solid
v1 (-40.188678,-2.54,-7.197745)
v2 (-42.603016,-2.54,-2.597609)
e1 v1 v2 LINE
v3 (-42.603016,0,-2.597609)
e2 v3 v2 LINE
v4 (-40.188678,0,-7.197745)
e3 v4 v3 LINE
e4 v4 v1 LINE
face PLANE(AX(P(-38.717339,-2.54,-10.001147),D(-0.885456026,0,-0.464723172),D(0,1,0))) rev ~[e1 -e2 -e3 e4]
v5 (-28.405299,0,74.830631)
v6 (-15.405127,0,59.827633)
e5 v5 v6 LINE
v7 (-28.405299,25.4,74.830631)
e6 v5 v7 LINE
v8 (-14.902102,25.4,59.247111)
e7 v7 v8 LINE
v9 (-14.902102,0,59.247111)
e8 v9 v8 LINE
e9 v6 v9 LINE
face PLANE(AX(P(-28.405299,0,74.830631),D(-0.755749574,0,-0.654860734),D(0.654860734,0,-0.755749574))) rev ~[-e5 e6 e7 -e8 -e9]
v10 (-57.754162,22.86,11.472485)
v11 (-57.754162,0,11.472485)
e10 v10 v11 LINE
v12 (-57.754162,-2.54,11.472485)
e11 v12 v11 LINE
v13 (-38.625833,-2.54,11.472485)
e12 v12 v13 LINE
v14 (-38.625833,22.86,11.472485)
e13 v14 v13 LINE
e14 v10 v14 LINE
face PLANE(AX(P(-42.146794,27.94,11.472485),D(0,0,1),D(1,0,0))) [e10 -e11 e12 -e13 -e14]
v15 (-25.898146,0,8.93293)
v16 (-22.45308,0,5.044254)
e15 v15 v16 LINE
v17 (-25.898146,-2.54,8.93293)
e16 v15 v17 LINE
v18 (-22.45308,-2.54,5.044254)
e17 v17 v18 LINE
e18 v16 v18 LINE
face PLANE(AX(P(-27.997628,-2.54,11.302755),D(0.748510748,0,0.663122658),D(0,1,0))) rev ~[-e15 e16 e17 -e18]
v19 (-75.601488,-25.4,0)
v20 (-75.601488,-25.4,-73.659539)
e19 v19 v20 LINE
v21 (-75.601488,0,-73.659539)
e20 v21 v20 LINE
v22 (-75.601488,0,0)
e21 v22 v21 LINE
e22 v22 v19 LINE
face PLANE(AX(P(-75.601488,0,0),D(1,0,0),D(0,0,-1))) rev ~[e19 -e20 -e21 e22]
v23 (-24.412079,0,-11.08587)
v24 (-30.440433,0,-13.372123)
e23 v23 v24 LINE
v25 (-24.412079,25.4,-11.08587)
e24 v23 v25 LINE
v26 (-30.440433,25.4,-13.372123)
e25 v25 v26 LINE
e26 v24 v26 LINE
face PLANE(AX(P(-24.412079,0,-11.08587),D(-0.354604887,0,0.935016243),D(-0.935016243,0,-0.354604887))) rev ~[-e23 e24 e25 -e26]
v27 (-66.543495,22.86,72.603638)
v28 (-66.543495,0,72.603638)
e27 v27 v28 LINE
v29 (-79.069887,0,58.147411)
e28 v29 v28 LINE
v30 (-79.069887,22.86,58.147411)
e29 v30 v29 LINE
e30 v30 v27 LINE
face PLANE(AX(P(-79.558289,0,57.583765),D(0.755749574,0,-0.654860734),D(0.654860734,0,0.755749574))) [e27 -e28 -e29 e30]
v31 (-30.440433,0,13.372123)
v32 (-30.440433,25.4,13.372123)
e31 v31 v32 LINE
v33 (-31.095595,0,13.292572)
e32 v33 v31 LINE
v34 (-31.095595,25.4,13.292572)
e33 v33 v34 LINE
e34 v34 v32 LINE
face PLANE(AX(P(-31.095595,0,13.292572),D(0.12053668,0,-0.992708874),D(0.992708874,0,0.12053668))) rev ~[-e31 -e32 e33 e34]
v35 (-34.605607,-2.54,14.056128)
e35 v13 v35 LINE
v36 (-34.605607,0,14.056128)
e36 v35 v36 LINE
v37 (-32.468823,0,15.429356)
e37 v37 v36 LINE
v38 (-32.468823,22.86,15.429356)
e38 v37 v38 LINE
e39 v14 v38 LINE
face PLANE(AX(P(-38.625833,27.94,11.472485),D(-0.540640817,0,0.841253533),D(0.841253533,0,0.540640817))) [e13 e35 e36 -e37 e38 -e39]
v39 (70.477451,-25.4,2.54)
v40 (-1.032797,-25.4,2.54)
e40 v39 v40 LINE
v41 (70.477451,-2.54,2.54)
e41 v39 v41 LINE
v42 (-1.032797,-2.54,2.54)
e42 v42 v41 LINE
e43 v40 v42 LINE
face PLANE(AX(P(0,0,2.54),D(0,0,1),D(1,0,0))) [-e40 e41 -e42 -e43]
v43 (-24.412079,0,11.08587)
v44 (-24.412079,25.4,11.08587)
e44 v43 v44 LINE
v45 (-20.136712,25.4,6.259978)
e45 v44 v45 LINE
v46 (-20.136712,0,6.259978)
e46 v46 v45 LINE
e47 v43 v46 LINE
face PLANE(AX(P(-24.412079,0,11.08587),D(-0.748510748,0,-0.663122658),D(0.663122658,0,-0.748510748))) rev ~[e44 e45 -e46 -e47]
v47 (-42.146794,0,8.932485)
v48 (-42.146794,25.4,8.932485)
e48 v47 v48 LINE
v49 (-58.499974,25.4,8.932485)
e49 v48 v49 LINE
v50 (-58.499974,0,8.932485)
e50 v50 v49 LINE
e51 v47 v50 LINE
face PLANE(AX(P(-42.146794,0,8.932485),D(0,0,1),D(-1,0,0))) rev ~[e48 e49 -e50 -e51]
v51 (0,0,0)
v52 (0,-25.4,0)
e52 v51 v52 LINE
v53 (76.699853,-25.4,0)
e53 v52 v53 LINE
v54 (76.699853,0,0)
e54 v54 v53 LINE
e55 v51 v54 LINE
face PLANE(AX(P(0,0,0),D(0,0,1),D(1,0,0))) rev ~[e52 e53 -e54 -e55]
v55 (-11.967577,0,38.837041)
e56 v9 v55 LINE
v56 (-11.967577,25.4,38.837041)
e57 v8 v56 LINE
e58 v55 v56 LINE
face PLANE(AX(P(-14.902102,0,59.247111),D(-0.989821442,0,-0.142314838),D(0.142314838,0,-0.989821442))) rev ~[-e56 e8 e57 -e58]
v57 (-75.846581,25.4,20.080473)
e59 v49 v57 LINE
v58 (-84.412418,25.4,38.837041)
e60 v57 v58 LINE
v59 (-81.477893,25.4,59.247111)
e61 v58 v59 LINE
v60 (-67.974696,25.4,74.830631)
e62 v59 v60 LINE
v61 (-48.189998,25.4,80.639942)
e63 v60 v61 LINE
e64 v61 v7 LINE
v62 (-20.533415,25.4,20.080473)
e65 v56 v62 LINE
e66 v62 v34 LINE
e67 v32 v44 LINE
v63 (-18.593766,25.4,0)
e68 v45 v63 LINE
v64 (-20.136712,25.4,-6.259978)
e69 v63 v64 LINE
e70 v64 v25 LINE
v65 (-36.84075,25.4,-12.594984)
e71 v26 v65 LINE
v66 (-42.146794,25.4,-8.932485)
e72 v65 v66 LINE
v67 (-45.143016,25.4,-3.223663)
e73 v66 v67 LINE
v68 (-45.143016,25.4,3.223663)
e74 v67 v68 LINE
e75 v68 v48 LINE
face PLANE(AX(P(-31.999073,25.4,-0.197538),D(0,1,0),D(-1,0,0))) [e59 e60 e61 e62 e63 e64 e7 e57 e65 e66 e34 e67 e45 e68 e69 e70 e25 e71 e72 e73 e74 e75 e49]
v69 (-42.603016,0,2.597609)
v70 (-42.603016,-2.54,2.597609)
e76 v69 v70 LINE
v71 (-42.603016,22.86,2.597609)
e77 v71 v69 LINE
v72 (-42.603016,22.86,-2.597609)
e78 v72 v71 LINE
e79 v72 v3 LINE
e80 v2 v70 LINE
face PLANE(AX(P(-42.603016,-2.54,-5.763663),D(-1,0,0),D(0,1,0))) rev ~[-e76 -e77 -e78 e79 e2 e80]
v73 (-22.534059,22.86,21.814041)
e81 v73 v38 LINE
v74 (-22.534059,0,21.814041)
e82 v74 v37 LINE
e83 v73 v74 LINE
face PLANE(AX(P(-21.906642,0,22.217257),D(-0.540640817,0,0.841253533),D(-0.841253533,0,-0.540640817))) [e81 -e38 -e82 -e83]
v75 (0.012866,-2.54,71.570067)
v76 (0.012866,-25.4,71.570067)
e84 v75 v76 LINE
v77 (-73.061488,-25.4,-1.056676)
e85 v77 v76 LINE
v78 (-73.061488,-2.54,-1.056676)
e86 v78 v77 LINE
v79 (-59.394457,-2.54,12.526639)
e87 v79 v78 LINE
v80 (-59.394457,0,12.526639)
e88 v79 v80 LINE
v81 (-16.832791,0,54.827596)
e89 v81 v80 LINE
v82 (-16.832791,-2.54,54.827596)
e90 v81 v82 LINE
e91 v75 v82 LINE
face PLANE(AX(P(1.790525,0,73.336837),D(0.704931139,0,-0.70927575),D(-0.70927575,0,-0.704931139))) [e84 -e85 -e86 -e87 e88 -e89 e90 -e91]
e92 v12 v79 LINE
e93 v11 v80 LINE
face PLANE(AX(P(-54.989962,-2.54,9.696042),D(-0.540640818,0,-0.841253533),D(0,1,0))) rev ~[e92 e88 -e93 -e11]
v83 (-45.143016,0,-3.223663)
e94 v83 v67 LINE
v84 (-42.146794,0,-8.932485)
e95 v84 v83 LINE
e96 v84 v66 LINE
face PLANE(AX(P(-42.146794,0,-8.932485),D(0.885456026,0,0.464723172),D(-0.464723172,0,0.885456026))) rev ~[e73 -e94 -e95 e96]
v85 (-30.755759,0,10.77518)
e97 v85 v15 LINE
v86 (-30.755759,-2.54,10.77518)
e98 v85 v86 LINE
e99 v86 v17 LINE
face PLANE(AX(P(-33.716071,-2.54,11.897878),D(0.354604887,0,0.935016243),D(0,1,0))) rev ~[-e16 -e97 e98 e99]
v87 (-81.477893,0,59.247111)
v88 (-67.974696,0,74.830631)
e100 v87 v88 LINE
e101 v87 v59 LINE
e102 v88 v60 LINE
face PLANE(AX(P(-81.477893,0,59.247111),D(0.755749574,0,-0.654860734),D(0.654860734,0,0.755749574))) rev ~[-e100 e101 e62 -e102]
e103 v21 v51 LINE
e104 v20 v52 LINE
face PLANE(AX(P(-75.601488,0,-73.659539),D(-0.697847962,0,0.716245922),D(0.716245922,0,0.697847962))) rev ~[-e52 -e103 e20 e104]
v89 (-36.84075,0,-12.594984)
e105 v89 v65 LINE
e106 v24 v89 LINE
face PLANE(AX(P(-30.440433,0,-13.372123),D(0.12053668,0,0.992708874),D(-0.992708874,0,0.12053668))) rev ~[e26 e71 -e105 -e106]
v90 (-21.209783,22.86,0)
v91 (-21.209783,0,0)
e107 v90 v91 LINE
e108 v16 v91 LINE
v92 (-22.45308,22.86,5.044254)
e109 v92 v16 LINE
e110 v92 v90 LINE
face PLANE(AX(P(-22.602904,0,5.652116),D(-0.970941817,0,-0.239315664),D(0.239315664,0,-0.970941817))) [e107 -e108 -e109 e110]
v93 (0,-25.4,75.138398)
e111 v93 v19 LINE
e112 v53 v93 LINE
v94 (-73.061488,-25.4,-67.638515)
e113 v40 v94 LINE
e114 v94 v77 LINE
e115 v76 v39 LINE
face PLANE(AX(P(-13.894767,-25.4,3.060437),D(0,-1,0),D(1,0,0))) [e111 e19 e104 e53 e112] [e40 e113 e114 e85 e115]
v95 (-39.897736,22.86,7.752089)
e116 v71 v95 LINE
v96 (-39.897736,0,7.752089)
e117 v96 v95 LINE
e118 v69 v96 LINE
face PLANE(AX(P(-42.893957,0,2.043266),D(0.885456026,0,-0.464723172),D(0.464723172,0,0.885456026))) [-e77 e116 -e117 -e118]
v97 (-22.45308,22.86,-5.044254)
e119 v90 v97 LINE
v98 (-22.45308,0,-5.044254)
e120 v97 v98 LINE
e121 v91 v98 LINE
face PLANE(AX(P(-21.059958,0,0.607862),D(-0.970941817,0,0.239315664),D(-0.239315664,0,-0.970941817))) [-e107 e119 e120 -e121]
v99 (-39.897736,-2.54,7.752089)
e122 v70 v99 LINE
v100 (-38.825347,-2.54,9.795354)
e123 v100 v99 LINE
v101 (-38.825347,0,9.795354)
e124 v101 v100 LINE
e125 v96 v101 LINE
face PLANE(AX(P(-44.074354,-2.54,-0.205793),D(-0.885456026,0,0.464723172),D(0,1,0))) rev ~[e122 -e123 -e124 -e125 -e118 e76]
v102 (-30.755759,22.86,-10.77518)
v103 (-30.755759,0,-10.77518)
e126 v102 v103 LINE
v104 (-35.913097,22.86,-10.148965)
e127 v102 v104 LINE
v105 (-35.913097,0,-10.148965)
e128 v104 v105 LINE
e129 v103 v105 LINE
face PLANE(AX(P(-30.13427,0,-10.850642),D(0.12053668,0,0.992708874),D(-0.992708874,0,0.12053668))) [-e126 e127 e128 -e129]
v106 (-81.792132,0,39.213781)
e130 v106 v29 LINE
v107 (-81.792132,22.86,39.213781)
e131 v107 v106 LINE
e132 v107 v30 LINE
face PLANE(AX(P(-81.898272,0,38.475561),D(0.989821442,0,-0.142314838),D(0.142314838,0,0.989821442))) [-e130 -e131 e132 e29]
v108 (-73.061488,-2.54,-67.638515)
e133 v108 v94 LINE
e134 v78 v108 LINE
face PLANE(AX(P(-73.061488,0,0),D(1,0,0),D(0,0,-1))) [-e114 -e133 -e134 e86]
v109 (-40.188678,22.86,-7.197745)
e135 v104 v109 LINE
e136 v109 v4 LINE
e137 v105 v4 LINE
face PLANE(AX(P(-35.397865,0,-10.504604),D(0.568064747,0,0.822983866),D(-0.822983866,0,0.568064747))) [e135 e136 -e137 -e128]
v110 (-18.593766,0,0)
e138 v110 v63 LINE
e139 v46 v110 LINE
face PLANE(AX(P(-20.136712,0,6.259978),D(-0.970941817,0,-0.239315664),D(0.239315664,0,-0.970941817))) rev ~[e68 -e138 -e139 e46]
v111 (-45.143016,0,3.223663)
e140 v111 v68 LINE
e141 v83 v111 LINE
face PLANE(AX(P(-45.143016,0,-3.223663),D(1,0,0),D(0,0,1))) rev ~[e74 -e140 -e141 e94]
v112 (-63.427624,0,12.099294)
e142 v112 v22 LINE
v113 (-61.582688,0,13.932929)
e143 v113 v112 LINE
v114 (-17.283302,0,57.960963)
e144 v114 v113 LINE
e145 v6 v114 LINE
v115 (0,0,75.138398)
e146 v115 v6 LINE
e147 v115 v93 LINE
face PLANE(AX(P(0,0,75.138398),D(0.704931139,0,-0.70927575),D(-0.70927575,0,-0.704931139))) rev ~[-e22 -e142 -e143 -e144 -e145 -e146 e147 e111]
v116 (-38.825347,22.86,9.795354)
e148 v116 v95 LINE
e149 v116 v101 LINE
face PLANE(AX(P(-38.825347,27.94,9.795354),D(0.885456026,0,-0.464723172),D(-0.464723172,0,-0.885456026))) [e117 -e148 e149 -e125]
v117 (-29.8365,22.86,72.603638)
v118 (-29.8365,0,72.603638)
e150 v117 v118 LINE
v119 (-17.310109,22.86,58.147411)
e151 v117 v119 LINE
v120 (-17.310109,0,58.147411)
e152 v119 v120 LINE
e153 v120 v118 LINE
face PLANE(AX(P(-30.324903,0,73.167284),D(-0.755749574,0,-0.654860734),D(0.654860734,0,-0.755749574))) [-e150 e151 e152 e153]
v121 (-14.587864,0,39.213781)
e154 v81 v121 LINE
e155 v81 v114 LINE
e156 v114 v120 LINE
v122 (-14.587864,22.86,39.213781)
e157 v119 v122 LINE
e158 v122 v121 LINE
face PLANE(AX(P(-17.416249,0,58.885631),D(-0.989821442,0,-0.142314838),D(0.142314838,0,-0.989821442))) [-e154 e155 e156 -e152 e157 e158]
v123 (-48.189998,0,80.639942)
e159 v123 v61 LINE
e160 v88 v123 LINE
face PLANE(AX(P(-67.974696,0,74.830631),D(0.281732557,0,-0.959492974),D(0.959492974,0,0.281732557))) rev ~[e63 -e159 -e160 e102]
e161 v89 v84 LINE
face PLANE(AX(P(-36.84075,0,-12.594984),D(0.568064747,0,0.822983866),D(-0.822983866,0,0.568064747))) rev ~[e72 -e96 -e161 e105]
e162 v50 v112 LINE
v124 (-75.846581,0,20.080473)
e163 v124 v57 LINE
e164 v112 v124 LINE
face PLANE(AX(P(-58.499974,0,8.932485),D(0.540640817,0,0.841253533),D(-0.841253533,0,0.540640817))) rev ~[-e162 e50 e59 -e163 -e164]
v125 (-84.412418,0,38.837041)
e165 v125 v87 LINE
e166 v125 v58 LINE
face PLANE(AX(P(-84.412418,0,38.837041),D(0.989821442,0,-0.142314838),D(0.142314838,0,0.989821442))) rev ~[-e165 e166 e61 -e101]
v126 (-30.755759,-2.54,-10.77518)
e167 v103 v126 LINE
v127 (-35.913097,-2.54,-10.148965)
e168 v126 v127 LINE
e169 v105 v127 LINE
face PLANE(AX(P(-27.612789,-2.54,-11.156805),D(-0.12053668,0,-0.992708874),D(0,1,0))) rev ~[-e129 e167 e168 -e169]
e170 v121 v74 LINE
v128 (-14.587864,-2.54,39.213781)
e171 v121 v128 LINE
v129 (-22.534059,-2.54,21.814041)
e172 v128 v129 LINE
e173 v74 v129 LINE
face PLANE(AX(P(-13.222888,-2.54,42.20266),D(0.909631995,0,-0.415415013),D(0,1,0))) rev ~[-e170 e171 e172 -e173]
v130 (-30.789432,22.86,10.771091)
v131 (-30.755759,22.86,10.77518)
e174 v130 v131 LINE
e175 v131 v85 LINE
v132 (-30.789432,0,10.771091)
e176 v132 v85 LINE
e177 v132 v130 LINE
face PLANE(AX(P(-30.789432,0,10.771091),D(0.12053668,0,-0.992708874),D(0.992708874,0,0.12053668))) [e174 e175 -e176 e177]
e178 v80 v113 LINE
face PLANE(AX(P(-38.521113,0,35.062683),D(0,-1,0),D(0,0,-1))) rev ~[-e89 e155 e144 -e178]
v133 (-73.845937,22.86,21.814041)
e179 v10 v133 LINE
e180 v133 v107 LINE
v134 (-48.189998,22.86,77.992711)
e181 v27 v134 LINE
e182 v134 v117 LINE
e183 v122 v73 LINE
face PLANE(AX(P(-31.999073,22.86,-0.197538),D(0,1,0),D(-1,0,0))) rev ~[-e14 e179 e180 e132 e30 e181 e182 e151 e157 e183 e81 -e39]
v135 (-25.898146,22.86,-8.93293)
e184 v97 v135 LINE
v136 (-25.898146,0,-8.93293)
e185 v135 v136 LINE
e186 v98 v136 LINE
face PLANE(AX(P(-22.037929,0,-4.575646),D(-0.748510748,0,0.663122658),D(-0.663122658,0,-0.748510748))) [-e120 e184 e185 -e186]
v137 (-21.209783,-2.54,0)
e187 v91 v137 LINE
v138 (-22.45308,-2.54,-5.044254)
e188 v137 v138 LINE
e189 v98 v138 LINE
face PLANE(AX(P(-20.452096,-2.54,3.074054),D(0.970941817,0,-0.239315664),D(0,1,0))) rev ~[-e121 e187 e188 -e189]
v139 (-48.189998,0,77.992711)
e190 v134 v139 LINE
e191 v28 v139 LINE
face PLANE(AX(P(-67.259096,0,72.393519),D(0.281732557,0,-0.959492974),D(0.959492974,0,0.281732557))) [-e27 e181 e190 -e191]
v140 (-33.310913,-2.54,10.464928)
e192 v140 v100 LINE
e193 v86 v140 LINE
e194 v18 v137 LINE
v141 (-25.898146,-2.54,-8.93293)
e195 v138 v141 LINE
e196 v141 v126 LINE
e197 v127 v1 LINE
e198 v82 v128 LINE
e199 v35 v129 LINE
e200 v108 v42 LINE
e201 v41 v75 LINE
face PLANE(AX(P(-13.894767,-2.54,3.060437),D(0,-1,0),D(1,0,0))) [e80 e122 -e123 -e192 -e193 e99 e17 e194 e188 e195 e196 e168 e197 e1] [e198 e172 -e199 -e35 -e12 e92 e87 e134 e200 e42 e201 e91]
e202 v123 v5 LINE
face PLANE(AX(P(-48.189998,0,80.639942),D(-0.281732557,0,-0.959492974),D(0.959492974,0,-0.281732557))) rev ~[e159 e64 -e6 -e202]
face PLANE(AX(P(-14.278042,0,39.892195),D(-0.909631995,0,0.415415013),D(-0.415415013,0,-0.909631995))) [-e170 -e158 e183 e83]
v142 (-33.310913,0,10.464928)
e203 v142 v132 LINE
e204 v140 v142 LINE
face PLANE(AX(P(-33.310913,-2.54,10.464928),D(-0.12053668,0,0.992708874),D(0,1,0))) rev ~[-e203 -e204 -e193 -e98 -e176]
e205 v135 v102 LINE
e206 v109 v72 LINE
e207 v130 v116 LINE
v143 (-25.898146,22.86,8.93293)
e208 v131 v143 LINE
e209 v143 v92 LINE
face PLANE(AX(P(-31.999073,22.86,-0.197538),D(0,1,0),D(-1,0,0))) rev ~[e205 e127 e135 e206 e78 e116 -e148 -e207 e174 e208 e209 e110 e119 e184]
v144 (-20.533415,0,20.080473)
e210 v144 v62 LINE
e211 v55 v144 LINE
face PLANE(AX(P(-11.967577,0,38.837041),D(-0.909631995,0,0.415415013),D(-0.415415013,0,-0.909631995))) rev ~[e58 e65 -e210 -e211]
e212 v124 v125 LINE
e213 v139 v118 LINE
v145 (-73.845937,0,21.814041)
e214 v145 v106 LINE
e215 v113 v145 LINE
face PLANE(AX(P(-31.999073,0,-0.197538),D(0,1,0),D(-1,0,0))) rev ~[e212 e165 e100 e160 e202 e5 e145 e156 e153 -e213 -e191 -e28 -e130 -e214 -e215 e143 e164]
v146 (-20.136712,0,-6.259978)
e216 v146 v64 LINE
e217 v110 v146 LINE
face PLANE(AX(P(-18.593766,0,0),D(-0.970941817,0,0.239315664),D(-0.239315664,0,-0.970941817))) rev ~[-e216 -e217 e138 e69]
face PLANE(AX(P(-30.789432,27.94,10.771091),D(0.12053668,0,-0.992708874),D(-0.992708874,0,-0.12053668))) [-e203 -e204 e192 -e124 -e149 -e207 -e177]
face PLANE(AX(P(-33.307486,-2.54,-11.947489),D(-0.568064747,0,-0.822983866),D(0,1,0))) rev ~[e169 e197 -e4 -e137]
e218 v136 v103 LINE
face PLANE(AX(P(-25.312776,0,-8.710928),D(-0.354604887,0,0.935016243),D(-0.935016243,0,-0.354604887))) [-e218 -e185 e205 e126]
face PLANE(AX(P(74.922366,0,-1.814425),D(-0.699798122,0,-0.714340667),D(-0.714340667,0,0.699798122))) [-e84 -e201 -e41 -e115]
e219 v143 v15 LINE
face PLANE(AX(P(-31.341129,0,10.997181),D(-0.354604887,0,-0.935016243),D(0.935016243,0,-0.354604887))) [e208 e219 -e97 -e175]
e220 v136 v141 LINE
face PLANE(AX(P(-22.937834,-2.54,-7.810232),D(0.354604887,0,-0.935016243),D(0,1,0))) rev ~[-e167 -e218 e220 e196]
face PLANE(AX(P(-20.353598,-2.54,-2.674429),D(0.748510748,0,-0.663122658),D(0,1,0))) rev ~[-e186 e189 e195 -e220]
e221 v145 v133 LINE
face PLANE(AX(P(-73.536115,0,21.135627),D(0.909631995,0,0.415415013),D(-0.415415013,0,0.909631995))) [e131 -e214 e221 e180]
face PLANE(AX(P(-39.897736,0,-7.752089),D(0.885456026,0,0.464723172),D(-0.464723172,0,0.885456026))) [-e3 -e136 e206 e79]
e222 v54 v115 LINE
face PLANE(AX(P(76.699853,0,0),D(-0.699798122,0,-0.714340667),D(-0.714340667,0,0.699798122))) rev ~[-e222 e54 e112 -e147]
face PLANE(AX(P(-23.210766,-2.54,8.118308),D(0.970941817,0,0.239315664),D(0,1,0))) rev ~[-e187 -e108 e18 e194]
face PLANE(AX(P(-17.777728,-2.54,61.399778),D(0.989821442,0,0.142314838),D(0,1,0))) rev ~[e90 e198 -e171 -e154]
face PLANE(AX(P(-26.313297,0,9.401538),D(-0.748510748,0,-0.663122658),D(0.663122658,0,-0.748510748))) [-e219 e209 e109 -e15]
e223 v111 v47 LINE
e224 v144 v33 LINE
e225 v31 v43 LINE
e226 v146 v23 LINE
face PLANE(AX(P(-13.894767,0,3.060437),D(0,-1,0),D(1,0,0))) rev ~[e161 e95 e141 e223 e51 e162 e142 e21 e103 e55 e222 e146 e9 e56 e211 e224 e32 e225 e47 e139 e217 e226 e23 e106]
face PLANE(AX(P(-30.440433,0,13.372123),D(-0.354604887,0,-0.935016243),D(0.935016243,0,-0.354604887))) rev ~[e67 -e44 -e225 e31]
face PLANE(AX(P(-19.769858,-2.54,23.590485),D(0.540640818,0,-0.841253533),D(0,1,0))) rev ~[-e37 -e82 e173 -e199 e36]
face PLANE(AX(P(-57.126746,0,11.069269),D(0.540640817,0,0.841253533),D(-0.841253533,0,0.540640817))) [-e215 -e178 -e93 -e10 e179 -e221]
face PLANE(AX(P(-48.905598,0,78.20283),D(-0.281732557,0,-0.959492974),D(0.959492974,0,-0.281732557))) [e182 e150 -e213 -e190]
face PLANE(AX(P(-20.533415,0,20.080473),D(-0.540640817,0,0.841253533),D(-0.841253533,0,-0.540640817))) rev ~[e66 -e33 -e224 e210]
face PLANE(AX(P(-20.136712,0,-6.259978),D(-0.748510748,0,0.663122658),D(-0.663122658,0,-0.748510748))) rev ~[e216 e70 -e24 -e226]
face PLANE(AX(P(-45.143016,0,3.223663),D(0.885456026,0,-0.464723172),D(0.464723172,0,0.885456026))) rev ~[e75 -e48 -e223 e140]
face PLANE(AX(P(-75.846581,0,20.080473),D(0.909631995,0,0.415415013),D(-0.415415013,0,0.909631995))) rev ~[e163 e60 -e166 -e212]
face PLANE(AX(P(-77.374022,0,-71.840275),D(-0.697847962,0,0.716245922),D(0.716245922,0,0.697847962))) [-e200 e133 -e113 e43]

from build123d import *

# Parameters (mm, degrees)
F1_DEPTH     = 25.4
F2_T         = -2.54
F4_DEPTH     = 25.4
F5_T         = 2.54
F5_T3_DEPTH  = 30.48
F5_T5_DEPTH  = 10.9375095944
F5_T7_DEPTH  = 21.4331791904
F5_T9_DEPTH  = 11.5273250997
F5_T11_DEPTH = 11.5273250997
F5_T13_DEPTH = 11.5273250997
F5_T15_DEPTH = 11.5273250997
F5_T17_DEPTH = 11.5273250997
F5_T19_DEPTH = 11.5273250997
F5_T21_DEPTH = 11.5273250997
F5_T23_DEPTH = 11.5273250997
F5_T25_DEPTH = 11.5273250997
F5_T27_DEPTH = 11.5273250997
F5_T29_DEPTH = 11.5273250997
F5_T31_DEPTH = 5.7399744024
F5_T33_DEPTH = 17.6352883916
F5_T35_DEPTH = 25.6999516571
F5_T37_DEPTH = 25.6999516571
F5_T39_DEPTH = 5.8481406641
F5_T41_DEPTH = 30.48
F5_T43_DEPTH = 27.94


# Not quite as in the source:
# - a shell that OpenCascade refuses in one call is made with other operations: the cavity is built on its own and cut out


with BuildPart() as f1:
    # F0 (on Front) → F1 (new body)
    with BuildSketch(Plane.XZ):
        Polygon((76.6998529434, 0), (0, 75.1383975148), (-75.6014883518, 0), (-75.6014883518, -73.6595392227), (0, 0), align=None)
    extrude(amount=F1_DEPTH)

    # F2
    f2_openings = [f1.faces().sort_by_distance(p)[0] for p in [
        (-16.251734, -25.4, 8.81054),
    ]]
    offset(amount=F2_T, openings=f2_openings, kind=Kind.INTERSECTION)

    # F3 (on face) → F4 (join)
    with BuildSketch(Plane(origin=(0, 0, 0), x_dir=(-1, 0, 0), z_dir=(0, 1, 0))):
        Polygon((45.1430156827, -3.2236625498), (45.1430156827, 3.2236625498), (42.1467943112, 8.9324854087), (37.8800218445, 8.9324854087), (31.0955953813, 13.2925715491), (30.4404329353, 13.3721226726), (24.4120792452, 11.0858696839), (20.1367118865, 6.2599775498), (18.5937659974, 0), (20.1367118865, -6.2599775498), (24.4120792452, -11.0858696839), (30.4404329353, -13.3721226726), (36.8407497759, -12.5949835086), (42.1467943112, -8.9324854087), align=None)
        Polygon((37.8800218445, 8.9324854087), (42.1467943112, 8.9324854087), (36.8407497759, 12.5949835086), (31.0955953813, 13.2925715491), align=None)
        Polygon((36.8407497759, 12.5949835086), (42.1467943112, 8.9324854087), (58.4999735016, 8.9324854087), (75.8465806799, 20.0804729285), (84.4124181657, 38.8370406985), (81.4778930804, 59.2471109792), (67.9746964043, 74.8306306673), (48.189997673, 80.6399423696), (28.4052989418, 74.8306306673), (14.9021022657, 59.2471109792), (11.9675771804, 38.8370406985), (20.5334146661, 20.0804729285), (31.0955953813, 13.2925715491), align=None)
    extrude(amount=F4_DEPTH)

    # F5: shell of thickness 2.54, made by hand


with BuildPart() as f5_core1:
    # F5_t2: copy of F1
    add(f1.part)

    # the walls: a layer under each face that stays
    f5_faces = [f5_core1.faces().sort_by_distance(p)[0] for p in [
        (38.3499264717, -12.7, 37.5691987574),
        (38.3499264717, -12.7, 0),
        (-37.8007441759, -12.7, 37.5691987574),
        (0.5491822958, 0, 0.7394291461),
        (0.5491822958, -25.4, 0.7394291461),
        (-37.8007441759, -12.7, -36.8297696114),
        (-75.6014883518, -12.7, -36.8297696114),
        (-67.1732770908, 12.7, 14.5064791686),
        (-50.3233839064, 12.7, 8.9324854087),
        (-43.6449049969, 12.7, 6.0780739793),
        (-45.1430156827, 12.7, 0),
        (-43.6449049969, 12.7, -6.0780739793),
        (-39.4937720436, 12.7, -10.7637344586),
        (-33.6405913556, 12.7, -12.9835530906),
        (-27.4262560902, 12.7, -12.2289961783),
        (-22.2743955659, 12.7, -8.6729236169),
        (-19.365238942, 12.7, -3.1299887749),
        (-19.365238942, 12.7, 3.1299887749),
        (-22.2743955659, 12.7, 8.6729236169),
        (-27.4262560902, 12.7, 12.2289961783),
        (-30.7680141583, 12.7, 13.3323471109),
        (-25.8145050237, 12.7, 16.6865222388),
        (-16.2504959233, 12.7, 29.4587568135),
        (-13.434839723, 12.7, 49.0420758389),
        (-21.6537006037, 12.7, 67.0388708233),
        (35.245158445, -13.97, 37.0550334809),
        (34.7223268727, -13.97, 2.54),
        (-37.0471427298, -13.97, -32.5492576556),
        (-73.0614883518, -13.97, -34.3475958286),
        (-36.5243111575, -13.97, 35.2566953079),
        (-38.2976483074, 12.7, 77.7352865185),
        (-58.0823470387, 12.7, 77.7352865185),
        (-74.7262947424, 12.7, 67.0388708233),
        (-82.945155623, 12.7, 49.0420758389),
        (-80.1294994228, 12.7, 29.4587568135),
        (-48.189997673, 25.4, 33.6339098485),
    ]]
    thicken(f5_faces, amount=-F5_T, mode=Mode.SUBTRACT)

    # F5_s4 → F5_t3 (cut)
    with BuildSketch(Plane.XZ.offset(-2.54)):
        Polygon((0.0177253382, -0.0435926464), (0, 2.54), (-1.0327971077, 2.54), (-1.7725338247, 1.8192646427), align=None)
    extrude(amount=F5_T3_DEPTH, mode=Mode.SUBTRACT)

    # F5_s6 → F5_t5 (cut)
    with BuildSketch(Plane(origin=(-43.3267236667, 0, 27.8443945691), x_dir=(0, 1, 0), z_dir=(-0.8412535328, 0, 0.5406408175))):
        Polygon((0.0254, 24.138388588), (-2.54, 24.112988588), (-2.54, 21.572988588), (0, 21.572988588), align=None)
    extrude(amount=F5_T5_DEPTH, mode=Mode.SUBTRACT)

    # F5_s8 → F5_t7 (cut)
    with BuildSketch(Plane.YZ.offset(-61.0399735016)):
        Polygon((0.0254, 8.9070854087), (-2.54, 8.9324854087), (-2.54, 11.4724854087), (0, 11.4724854087), align=None)
    extrude(amount=F5_T7_DEPTH, mode=Mode.SUBTRACT)

    # F5_s10 → F5_t9 (cut)
    with BuildSketch(Plane(origin=(-9.6033156793, 0, -18.2975892876), x_dir=(0, 1, 0), z_dir=(0.464723172, 0, 0.8854560257))):
        Polygon((0.0254, 41.4956659382), (-2.54, 41.4702659382), (-2.54, 38.9302659382), (0, 38.9302659382), align=None)
    extrude(amount=F5_T9_DEPTH, mode=Mode.SUBTRACT)

    # F5_s12 → F5_t11 (cut)
    with BuildSketch(Plane.XY.offset(-5.7636625498)):
        Polygon((-45.1684156827, 0.0254), (-45.1430156827, -2.54), (-42.6030156827, -2.54), (-42.6030156827, 0), align=None)
    extrude(amount=F5_T11_DEPTH, mode=Mode.SUBTRACT)

    # F5_s14 → F5_t13 (cut)
    with BuildSketch(Plane(origin=(-4.2463005938, 0, 8.0906498184), x_dir=(0, 1, 0), z_dir=(-0.464723172, 0, 0.8854560257))):
        Polygon((0.0254, 41.4956659382), (-2.54, 41.4702659382), (-2.54, 38.9302659382), (0, 38.9302659382), align=None)
    extrude(amount=F5_T13_DEPTH, mode=Mode.SUBTRACT)

    # F5_s16 → F5_t15 (cut)
    with BuildSketch(Plane(origin=(-16.9736937466, 0, 11.7160948578), x_dir=(0, 1, 0), z_dir=(-0.8229838659, 0, 0.5680647467))):
        Polygon((0.0254, 31.3187994096), (-2.54, 31.2933994096), (-2.54, 28.7533994096), (0, 28.7533994096), align=None)
    extrude(amount=F5_T15_DEPTH, mode=Mode.SUBTRACT)

    # F5_s18 → F5_t17 (cut)
    with BuildSketch(Plane(origin=(-25.876601356, 0, 3.1419882557), x_dir=(0, 1, 0), z_dir=(-0.9927088741, 0, 0.1205366803))):
        Polygon((0.0254, 16.9692135742), (-2.54, 16.9438135742), (-2.54, 14.4038135742), (0, 14.4038135742), align=None)
    extrude(amount=F5_T17_DEPTH, mode=Mode.SUBTRACT)

    # F5_s20 → F5_t19 (cut)
    with BuildSketch(Plane(origin=(-22.6430959031, 0, -8.5873935644), x_dir=(0, 1, 0), z_dir=(-0.9350162427, 0, -0.354604887))):
        Polygon((0.0254, 1.7342256155), (-2.54, 1.7088256155), (-2.54, -0.8311743845), (0, -0.8311743845), align=None)
    extrude(amount=F5_T19_DEPTH, mode=Mode.SUBTRACT)

    # F5_s22 → F5_t21 (cut)
    with BuildSketch(Plane(origin=(-10.277585823, 0, -11.6009962232), x_dir=(0, 1, 0), z_dir=(-0.6631226582, 0, -0.7485107482))):
        Polygon((0.0254, -10.8960123265), (-2.54, -10.9214123265), (-2.54, -13.4614123265), (0, -13.4614123265), align=None)
    extrude(amount=F5_T21_DEPTH, mode=Mode.SUBTRACT)

    # F5_s24 → F5_t23 (cut)
    with BuildSketch(Plane(origin=(-0.4570401404, 0, -1.854284741), x_dir=(0, 1, 0), z_dir=(-0.2393156643, 0, -0.9709418174))):
        Polygon((0.0254, -18.0280649503), (-2.54, -18.0534649503), (-2.54, -20.5934649503), (0, -20.5934649503), align=None)
    extrude(amount=F5_T23_DEPTH, mode=Mode.SUBTRACT)

    # F5_s26 → F5_t25 (cut)
    with BuildSketch(Plane(origin=(-3.2157096041, 0, 13.0466467234), x_dir=(0, 1, 0), z_dir=(0.2393156643, 0, -0.9709418174))):
        Polygon((0.0254, -18.0280649503), (-2.54, -18.0534649503), (-2.54, -20.5934649503), (0, -20.5934649503), align=None)
    extrude(amount=F5_T25_DEPTH, mode=Mode.SUBTRACT)

    # F5_s28 → F5_t27 (cut)
    with BuildSketch(Plane(origin=(-17.9216162855, 0, 20.229322958), x_dir=(0, 1, 0), z_dir=(0.6631226582, 0, -0.7485107482))):
        Polygon((0.0254, -10.8960123265), (-2.54, -10.9214123265), (-2.54, -13.4614123265), (0, -13.4614123265), align=None)
    extrude(amount=F5_T27_DEPTH, mode=Mode.SUBTRACT)

    # F5_s30 → F5_t29 (cut)
    with BuildSketch(Plane(origin=(-33.4213321061, 0, 12.6750393793), x_dir=(0, 1, 0), z_dir=(0.9350162427, 0, -0.354604887))):
        Polygon((0.0254, 1.7342256155), (-2.54, 1.7088256155), (-2.54, -0.8311743845), (0, -0.8311743845), align=None)
    extrude(amount=F5_T29_DEPTH, mode=Mode.SUBTRACT)

    # F5_s32 → F5_t31 (cut)
    with BuildSketch(Plane(origin=(-31.5747248824, 0, -3.8338657149), x_dir=(0, 1, 0), z_dir=(0.9927088741, 0, 0.1205366803))):
        Polygon((0.0254, 16.9692135742), (-2.54, 16.9438135742), (-2.54, 14.4038135742), (0, 14.4038135742), align=None)
    extrude(amount=F5_T31_DEPTH, mode=Mode.SUBTRACT)

    # F5_s34 → F5_t33 (cut)
    with BuildSketch(Plane(origin=(-3.2619473911, 0, -2.0963262978), x_dir=(0, 1, 0), z_dir=(-0.8412535328, 0, -0.5406408175))):
        Polygon((0.0254, -27.9685708823), (-2.54, -27.9939708823), (-2.54, -30.5339708823), (0, -30.5339708823), align=None)
    extrude(amount=F5_T33_DEPTH, mode=Mode.SUBTRACT)

    # F5_s36 → F5_t35 (cut)
    with BuildSketch(Plane(origin=(13.6654522193, 0, 29.9231664254), x_dir=(0, 1, 0), z_dir=(-0.415415013, 0, -0.9096319954))):
        Polygon((0.0254, -26.9941808769), (-2.54, -27.0195808769), (-2.54, -29.5595808769), (0, -29.5595808769), align=None)
    extrude(amount=F5_T35_DEPTH, mode=Mode.SUBTRACT)

    # F5_s38 → F5_t37 (cut)
    with BuildSketch(Plane(origin=(-9.0092196449, 0, 62.6604989846), x_dir=(0, 1, 0), z_dir=(0.1423148383, 0, -0.9898214419))):
        Polygon((0.0254, -6.2932773345), (-2.54, -6.3186773345), (-2.54, -8.8586773345), (0, -8.8586773345), align=None)
    extrude(amount=F5_T37_DEPTH, mode=Mode.SUBTRACT)

    # F5_s40 → F5_t39 (cut)
    with BuildSketch(Plane(origin=(-37.8790578276, 0, 43.7147630729), x_dir=(0, 1, 0), z_dir=(0.6548607339, 0, -0.7557495744))):
        Polygon((0.0254, 27.5617491357), (-2.54, 27.5363491357), (-2.54, 24.9963491357), (0, 24.9963491357), align=None)
    extrude(amount=F5_T39_DEPTH, mode=Mode.SUBTRACT)

    # F5_s42 → F5_t41 (cut)
    with BuildSketch(Plane.XZ.offset(-27.94)):
        Polygon((-42.1692848942, 8.9188893773), (-42.1467943112, 11.4724854087), (-37.9451211064, 11.4724854087), (-39.897736006, 7.7520885517), align=None)
        Polygon((-31.0849247362, 13.2964185148), (-30.7894322134, 10.7710910089), (-41.7969422831, 9.4345373059), (-32.4688230576, 15.4293555225), align=None)
    extrude(amount=F5_T41_DEPTH, mode=Mode.SUBTRACT)

    # F5_s44 → F5_t43 (cut)
    with BuildSketch(Plane.XZ):
        Polygon((70.4596759808, 2.5472557471), (72.254938082, 4.3544252949), (76.6998529434, 0), (70.4774508531, 0), align=None)
        Polygon((0.0129964155, 71.5339071047), (1.7903532658, 73.3844922566), (0, 75.1383975148), (-1.7776590552, 73.3716273672), align=None)
        Polygon((-73.0538136901, -67.6203226649), (-71.2889545271, -69.457779954), (-75.6014883518, -73.6595392227), (-75.6014883518, -67.6385153113), align=None)
        Polygon((-73.0181831009, -1.0746919499), (-75.6014883518, -1.0566763458), (-75.6014883518, 0), (-74.8520134439, 0.7448840596), align=None)
    extrude(amount=F5_T43_DEPTH, mode=Mode.SUBTRACT)


with BuildPart() as f1_1:
    add(f1.part)

    # what is left inside the walls is the cavity
    f5_cavity = [f5_core1.part.solids().sort_by_distance(p)[0] for p in [
        (-48.189998, 22.8346, 33.645894),
        (-31.906399, 22.8346, -3.591727),
    ]]
    add(f5_cavity, mode=Mode.SUBTRACT)


solid = f1_1.part
